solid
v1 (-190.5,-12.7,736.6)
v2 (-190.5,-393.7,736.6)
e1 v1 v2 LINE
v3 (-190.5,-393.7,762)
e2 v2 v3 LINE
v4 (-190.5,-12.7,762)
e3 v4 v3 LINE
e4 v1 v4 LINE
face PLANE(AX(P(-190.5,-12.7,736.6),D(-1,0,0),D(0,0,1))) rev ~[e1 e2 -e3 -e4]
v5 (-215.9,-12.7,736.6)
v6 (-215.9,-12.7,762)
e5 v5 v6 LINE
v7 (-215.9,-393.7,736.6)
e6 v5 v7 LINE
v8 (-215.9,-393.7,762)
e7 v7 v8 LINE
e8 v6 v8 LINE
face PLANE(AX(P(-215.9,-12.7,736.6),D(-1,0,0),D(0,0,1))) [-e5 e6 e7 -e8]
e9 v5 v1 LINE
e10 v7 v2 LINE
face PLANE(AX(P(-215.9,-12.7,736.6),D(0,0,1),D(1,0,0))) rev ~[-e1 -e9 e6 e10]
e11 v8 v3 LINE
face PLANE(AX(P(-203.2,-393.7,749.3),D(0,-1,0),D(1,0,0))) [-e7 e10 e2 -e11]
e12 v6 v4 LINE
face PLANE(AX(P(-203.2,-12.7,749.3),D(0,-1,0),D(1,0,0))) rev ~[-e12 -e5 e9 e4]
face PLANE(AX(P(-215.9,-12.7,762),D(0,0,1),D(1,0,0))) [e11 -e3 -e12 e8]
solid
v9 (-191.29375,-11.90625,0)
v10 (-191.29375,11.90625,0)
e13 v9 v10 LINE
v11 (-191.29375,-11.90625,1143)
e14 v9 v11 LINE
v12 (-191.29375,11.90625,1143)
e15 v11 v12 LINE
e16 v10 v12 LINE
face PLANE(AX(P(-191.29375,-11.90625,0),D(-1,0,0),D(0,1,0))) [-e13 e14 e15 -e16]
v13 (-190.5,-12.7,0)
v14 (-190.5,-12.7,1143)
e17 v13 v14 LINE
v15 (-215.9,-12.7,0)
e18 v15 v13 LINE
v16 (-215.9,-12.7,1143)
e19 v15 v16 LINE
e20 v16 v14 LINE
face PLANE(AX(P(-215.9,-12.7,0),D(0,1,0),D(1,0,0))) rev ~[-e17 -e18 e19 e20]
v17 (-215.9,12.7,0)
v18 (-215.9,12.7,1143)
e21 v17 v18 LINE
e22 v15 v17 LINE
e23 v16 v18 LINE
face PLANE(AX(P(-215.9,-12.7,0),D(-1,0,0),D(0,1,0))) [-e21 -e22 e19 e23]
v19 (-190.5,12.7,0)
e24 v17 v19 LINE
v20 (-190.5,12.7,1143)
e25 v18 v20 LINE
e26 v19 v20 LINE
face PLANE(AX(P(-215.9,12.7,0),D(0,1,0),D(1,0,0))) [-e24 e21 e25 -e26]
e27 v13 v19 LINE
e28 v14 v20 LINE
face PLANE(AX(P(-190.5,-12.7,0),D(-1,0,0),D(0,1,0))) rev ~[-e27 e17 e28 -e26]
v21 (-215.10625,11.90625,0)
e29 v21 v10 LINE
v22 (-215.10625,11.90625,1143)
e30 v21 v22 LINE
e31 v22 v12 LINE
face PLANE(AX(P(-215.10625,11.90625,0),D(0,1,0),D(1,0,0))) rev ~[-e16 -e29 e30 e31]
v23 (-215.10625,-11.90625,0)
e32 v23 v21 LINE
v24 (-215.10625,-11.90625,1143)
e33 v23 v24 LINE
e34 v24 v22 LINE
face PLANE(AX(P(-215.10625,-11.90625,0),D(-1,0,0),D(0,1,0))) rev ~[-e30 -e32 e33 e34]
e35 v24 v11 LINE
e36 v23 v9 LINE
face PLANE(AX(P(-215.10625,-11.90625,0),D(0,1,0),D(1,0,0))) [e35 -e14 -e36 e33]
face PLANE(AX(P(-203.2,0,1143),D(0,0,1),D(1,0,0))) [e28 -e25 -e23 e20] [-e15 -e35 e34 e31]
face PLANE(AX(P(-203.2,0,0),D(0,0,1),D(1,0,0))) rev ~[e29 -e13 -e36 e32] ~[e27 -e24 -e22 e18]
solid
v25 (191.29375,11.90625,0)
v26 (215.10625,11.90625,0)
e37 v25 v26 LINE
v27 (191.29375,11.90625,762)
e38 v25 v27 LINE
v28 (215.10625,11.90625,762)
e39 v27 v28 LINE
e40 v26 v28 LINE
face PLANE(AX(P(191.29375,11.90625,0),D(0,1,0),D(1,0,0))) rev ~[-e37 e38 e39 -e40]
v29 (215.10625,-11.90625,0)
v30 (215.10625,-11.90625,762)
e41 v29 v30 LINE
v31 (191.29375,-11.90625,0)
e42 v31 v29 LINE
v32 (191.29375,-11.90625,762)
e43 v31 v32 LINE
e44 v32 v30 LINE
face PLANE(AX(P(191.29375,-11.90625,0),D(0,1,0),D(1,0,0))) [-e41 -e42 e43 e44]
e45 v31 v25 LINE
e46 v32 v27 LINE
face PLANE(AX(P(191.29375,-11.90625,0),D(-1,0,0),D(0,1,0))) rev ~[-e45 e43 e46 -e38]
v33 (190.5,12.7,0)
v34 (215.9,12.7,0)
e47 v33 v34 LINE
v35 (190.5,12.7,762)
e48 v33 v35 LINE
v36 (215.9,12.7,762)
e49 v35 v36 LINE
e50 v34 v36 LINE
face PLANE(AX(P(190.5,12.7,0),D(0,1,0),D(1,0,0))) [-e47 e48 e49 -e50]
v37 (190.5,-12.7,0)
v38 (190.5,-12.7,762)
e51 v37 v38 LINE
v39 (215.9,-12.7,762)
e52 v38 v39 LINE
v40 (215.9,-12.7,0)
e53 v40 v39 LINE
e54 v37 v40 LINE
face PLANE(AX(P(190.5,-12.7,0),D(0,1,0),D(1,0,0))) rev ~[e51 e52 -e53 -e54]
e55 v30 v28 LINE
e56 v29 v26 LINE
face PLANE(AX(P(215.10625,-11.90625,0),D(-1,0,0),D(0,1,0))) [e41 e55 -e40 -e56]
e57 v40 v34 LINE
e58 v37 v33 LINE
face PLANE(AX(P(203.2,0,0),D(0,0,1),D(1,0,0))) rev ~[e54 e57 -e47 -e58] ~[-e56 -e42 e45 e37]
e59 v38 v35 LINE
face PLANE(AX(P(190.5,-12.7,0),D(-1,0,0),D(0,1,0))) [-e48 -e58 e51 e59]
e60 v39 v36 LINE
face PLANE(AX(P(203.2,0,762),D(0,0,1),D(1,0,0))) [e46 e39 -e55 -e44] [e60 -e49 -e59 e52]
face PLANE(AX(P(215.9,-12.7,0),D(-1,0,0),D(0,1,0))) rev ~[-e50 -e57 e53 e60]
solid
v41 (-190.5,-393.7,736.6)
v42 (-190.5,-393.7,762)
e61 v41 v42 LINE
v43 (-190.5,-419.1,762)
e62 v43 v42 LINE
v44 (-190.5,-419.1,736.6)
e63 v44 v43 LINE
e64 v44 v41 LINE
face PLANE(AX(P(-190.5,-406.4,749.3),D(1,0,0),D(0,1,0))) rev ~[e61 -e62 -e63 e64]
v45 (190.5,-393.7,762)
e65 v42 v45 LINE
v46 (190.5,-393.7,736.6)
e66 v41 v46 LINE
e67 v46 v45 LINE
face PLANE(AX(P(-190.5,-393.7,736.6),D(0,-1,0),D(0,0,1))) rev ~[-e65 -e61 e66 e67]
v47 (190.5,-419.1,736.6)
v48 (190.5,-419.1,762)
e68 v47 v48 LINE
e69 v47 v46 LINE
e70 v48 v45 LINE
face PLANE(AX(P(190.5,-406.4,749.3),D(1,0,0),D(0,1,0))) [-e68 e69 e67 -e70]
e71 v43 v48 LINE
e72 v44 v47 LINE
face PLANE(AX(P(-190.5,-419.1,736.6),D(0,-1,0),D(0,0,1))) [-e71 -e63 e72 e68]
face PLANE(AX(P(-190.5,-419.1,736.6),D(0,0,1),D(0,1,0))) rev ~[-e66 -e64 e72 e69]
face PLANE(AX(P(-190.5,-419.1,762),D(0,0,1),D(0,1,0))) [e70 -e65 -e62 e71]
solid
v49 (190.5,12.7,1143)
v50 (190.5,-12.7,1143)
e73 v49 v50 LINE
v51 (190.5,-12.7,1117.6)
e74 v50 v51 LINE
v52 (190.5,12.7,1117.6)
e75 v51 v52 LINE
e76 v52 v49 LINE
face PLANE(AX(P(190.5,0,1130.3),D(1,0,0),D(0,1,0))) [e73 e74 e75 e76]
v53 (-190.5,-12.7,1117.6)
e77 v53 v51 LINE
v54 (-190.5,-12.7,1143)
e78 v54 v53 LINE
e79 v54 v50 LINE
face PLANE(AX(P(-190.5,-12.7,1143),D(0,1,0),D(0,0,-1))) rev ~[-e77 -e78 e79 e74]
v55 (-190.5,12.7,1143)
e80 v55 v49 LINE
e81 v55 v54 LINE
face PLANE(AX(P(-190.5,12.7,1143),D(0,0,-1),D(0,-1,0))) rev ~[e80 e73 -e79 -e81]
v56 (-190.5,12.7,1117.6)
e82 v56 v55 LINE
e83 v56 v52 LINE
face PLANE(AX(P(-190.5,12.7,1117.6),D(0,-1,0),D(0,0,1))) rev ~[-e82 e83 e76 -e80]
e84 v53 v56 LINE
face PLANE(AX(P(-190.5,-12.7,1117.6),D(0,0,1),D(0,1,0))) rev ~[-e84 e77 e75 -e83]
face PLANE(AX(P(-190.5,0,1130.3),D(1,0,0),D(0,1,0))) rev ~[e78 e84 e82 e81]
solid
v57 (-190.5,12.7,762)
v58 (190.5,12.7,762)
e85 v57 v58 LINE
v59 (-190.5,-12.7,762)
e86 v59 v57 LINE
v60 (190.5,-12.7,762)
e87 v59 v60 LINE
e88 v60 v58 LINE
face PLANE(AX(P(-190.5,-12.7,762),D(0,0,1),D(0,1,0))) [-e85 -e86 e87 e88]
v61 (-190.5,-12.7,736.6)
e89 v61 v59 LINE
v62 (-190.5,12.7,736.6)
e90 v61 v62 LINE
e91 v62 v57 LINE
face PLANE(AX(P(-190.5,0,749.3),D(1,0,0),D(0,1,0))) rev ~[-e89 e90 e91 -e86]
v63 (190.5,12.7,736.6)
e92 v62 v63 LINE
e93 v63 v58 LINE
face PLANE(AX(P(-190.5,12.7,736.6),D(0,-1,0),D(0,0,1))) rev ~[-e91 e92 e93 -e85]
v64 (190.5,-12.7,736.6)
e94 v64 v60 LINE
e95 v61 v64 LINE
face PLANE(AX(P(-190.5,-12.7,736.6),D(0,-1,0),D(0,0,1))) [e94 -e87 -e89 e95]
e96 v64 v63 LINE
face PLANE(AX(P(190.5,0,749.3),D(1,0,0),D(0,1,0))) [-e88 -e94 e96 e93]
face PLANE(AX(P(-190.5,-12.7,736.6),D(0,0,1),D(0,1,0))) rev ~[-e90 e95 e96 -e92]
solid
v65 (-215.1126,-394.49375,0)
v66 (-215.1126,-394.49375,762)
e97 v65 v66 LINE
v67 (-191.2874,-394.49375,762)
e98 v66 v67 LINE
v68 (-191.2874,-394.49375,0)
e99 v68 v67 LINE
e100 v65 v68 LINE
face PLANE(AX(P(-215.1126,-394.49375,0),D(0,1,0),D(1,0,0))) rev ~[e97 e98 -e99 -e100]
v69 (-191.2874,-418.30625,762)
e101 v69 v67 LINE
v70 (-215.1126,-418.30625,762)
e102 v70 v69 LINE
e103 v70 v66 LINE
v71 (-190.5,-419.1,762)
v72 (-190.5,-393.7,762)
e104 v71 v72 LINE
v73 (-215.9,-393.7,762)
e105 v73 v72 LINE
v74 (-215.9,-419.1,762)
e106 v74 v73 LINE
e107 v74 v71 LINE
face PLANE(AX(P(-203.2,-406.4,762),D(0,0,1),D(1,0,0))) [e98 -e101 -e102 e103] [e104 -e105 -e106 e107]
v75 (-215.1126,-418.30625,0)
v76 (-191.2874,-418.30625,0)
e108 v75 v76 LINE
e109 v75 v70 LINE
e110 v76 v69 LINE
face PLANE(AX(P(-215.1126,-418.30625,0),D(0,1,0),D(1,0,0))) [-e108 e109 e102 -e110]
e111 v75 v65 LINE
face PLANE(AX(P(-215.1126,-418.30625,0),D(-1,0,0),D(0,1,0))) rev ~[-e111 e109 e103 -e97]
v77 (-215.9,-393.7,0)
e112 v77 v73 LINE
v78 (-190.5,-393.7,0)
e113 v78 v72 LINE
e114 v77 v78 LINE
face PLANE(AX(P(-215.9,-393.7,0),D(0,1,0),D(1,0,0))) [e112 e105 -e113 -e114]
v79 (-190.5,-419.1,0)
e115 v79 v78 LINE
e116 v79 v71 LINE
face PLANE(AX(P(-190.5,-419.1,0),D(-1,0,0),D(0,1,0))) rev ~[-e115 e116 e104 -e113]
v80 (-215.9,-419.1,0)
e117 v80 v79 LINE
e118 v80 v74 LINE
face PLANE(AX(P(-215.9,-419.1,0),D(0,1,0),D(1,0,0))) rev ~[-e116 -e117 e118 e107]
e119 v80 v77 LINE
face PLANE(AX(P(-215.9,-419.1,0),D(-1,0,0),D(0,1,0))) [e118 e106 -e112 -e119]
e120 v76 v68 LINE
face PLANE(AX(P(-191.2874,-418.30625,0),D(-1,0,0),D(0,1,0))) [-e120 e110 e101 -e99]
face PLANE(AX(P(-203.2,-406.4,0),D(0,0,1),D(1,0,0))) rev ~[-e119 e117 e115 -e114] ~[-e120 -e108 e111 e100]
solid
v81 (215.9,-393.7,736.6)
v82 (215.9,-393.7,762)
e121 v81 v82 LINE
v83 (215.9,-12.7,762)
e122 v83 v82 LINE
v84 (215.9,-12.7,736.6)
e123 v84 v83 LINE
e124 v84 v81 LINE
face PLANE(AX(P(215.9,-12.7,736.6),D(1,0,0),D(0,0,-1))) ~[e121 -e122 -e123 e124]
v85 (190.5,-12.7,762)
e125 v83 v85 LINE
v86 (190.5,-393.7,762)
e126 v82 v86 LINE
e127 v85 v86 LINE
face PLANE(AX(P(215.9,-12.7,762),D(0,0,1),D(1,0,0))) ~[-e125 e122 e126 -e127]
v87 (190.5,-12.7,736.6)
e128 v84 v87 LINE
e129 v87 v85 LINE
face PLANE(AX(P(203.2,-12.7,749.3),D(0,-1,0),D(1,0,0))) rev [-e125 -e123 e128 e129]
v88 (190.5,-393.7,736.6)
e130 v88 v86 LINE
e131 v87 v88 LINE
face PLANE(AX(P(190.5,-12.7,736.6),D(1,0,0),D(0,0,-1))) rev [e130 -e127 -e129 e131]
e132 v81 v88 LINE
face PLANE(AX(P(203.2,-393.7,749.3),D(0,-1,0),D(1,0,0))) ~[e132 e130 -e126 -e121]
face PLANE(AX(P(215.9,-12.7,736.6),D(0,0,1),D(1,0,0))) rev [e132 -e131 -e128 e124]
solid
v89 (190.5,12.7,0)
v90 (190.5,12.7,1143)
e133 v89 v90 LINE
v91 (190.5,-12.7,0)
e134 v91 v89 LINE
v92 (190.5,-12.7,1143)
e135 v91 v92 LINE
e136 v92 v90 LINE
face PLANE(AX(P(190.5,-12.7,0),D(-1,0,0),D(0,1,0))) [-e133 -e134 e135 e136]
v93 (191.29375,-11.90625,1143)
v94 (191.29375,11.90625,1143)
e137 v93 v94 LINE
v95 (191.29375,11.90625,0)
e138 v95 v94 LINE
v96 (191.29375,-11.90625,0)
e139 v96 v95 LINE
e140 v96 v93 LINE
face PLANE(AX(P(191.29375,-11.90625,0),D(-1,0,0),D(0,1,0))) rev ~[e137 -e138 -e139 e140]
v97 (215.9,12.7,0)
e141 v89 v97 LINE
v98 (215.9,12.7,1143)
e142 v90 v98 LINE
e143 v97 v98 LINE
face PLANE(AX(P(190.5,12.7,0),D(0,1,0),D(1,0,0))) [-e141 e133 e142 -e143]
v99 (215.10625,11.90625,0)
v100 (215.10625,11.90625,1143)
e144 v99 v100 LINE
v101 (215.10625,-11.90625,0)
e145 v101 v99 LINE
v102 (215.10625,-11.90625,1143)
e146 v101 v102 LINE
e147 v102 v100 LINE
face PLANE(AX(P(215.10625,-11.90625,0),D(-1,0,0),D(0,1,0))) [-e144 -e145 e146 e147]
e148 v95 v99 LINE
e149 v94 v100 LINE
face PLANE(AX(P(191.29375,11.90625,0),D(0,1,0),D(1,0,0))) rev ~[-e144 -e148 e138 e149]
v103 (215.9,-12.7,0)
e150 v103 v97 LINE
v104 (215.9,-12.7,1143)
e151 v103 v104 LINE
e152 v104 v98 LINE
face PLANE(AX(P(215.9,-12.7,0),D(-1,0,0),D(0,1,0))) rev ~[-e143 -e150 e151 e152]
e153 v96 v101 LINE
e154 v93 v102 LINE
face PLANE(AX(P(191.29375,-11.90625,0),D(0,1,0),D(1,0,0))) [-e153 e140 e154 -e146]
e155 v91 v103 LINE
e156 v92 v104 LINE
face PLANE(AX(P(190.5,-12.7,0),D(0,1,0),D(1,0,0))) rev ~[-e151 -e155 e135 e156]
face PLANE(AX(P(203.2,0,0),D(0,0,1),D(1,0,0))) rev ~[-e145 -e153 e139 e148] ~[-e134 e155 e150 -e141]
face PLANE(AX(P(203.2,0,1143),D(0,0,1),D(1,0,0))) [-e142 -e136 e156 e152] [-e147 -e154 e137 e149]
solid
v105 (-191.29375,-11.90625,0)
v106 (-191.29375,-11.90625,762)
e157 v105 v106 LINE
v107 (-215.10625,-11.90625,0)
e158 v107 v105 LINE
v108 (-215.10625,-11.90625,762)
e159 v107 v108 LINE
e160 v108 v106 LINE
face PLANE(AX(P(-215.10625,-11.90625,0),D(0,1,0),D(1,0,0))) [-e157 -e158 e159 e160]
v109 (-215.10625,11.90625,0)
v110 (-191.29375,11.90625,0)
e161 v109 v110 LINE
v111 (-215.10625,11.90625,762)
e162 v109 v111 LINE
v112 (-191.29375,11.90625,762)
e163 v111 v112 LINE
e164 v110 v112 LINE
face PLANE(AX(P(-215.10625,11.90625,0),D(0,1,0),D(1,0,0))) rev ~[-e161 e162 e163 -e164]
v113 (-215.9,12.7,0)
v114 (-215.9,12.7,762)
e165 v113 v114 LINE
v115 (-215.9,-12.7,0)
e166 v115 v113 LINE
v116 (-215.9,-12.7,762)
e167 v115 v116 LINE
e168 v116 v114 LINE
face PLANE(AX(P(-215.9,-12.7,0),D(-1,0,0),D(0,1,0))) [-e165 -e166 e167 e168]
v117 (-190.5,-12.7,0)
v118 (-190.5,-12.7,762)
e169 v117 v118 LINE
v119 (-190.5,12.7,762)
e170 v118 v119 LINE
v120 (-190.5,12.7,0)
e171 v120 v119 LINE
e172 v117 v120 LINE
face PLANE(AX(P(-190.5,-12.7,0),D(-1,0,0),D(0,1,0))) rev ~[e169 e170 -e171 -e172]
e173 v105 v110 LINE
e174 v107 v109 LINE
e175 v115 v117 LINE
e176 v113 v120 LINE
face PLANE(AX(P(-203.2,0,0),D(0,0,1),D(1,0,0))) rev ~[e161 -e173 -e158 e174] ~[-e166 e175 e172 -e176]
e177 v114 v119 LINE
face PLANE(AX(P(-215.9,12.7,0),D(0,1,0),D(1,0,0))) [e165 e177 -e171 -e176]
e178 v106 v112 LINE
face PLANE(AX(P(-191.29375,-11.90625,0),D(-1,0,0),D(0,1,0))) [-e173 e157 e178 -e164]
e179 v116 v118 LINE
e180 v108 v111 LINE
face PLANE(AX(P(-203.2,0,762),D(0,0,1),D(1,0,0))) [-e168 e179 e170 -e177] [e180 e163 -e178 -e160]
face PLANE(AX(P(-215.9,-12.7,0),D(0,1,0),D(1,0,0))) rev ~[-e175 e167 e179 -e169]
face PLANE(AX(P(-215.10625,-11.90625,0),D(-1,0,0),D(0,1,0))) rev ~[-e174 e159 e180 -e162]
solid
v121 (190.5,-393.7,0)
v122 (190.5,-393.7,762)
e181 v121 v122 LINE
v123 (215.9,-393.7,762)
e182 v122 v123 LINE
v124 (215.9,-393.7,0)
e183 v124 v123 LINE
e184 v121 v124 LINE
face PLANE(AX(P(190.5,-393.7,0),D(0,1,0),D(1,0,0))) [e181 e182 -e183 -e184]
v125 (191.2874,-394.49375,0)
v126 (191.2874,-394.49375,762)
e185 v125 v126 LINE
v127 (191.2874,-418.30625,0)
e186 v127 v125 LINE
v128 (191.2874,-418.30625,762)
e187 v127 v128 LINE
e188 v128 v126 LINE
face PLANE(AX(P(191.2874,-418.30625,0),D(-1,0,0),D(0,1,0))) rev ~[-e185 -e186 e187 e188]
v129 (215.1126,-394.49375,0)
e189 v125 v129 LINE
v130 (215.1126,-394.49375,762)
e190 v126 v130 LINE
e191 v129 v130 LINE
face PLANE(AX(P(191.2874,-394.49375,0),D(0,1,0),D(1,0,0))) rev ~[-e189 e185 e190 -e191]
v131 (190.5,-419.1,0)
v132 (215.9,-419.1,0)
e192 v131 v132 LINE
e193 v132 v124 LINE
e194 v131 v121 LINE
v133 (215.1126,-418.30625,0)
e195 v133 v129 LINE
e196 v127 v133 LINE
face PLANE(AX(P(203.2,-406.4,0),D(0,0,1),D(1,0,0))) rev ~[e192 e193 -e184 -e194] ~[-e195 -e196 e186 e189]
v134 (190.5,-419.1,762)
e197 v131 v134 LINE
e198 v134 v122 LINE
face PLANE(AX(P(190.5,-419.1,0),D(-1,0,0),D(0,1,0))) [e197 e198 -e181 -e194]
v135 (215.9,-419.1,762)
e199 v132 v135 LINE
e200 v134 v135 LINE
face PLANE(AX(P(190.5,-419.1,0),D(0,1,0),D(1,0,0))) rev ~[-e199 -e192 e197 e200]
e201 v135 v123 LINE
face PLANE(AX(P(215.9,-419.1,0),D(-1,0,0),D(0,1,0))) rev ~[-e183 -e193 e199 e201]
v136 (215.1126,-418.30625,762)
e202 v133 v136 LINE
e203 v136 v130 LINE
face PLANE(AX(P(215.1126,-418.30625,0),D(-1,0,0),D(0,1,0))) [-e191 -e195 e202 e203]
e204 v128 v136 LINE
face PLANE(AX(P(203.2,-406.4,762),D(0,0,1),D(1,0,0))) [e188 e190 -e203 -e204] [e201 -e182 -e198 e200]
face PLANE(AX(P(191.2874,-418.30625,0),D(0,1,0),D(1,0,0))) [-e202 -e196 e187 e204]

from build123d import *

# Parameters (mm, degrees)
F0_W      = 25.4
F0_H      = 25.4
F0_W_2    = 23.8125
F0_H_2    = 23.8125
F1_DEPTH  = 1143
F0_W_3    = 23.8252
F2_W      = 25.4
F2_H      = 25.4
F3_DEPTH  = 381
F7_DEPTH  = 762
F8_W      = 25.4
F8_H      = 25.4
F9_DEPTH  = 381
F10_W     = 25.4
F10_H     = 38.2154002551
F11_DEPTH = 381
F10_H_2   = 25.4
F14_DEPTH = 381


# Not quite as in the source:
# - the program builds the solid bodies; features that only make, move or delete a surface that nothing else refers to are left out


with BuildPart() as f1:
    # F0 (on Top) → F1 (new body)
    with BuildSketch(Plane.XY):
        with Locations((-203.2, 0)):
            Rectangle(F0_W, F0_H)
        with Locations((-203.2, 0)):
            Rectangle(F0_W_2, F0_H_2, mode=Mode.SUBTRACT)
    extrude(amount=F1_DEPTH)


with BuildPart() as f1b:
    # F0 (on Top) → F1, piece 2 (new body)
    with BuildSketch(Plane.XY):
        with Locations((203.2, 0)):
            Rectangle(F0_W, F0_H)
        with Locations((203.2, 0)):
            Rectangle(F0_W_2, F0_H_2, mode=Mode.SUBTRACT)
    extrude(amount=F1_DEPTH)


with BuildPart() as f1c:
    # F0 (on Top) → F1, piece 3 (new body)
    with BuildSketch(Plane.XY):
        with Locations((-203.2, -406.4)):
            Rectangle(F0_W, F0_H)
        with Locations((-203.2, -406.4)):
            Rectangle(F0_W_3, F0_H_2, mode=Mode.SUBTRACT)
    extrude(amount=F1_DEPTH)


with BuildPart() as f1d:
    # F0 (on Top) → F1, piece 4 (new body)
    with BuildSketch(Plane.XY):
        with Locations((203.2, -406.4)):
            Rectangle(F0_W, F0_H)
        with Locations((203.2, -406.4)):
            Rectangle(F0_W_3, F0_H_2, mode=Mode.SUBTRACT)
    extrude(amount=F1_DEPTH)


with BuildPart() as f3:
    # F2 (on face) → F3 (new body)
    with BuildSketch(Plane.XZ.offset(12.7)):
        with Locations((-203.2, 749.3)):
            Rectangle(F2_W, F2_H)
    extrude(amount=F3_DEPTH)


with BuildPart() as f4_1:
    # F4: instance of F3
    add(f3.part.mirror(Plane.YZ))


with BuildPart() as f7:
    # F0 (on Top) → F7 (new body)
    with BuildSketch(Plane.XY):
        with Locations((-203.2, 0)):
            Rectangle(F0_W, F0_H)
        with Locations((-203.2, 0)):
            Rectangle(F0_W_2, F0_H_2, mode=Mode.SUBTRACT)
    extrude(amount=F7_DEPTH)


with BuildPart() as f7b:
    # F0 (on Top) → F7, piece 2 (new body)
    with BuildSketch(Plane.XY):
        with Locations((203.2, 0)):
            Rectangle(F0_W, F0_H)
        with Locations((203.2, 0)):
            Rectangle(F0_W_2, F0_H_2, mode=Mode.SUBTRACT)
    extrude(amount=F7_DEPTH)


with BuildPart() as f7c:
    # F0 (on Top) → F7, piece 3 (new body)
    with BuildSketch(Plane.XY):
        with Locations((-203.2, -406.4)):
            Rectangle(F0_W, F0_H)
        with Locations((-203.2, -406.4)):
            Rectangle(F0_W_3, F0_H_2, mode=Mode.SUBTRACT)
    extrude(amount=F7_DEPTH)


with BuildPart() as f7d:
    # F0 (on Top) → F7, piece 4 (new body)
    with BuildSketch(Plane.XY):
        with Locations((203.2, -406.4)):
            Rectangle(F0_W, F0_H)
        with Locations((203.2, -406.4)):
            Rectangle(F0_W_3, F0_H_2, mode=Mode.SUBTRACT)
    extrude(amount=F7_DEPTH)


with BuildPart() as f9:
    # F8 (on face) → F9 (new body)
    with BuildSketch(Plane.YZ.offset(-190.5)):
        with Locations((-406.4, 749.3)):
            Rectangle(F8_W, F8_H)
    extrude(amount=F9_DEPTH)


with BuildPart() as f11:
    # F10 (on face) → F11 (new body)
    with BuildSketch(Plane.YZ.offset(-190.5)):
        with Locations((0, 1047.0973100239)):
            Rectangle(F10_W, F10_H)
    extrude(amount=F11_DEPTH)


with BuildPart() as f11b:
    # F10 (on face) → F11, piece 2 (new body)
    with BuildSketch(Plane.YZ.offset(-190.5)):
        with Locations((0, 749.3)):
            Rectangle(F10_W, F10_H_2)
    extrude(amount=F11_DEPTH)


with BuildPart() as f14:
    # F13 (on face) → F14 (new body)
    with BuildSketch(Plane.YZ.offset(-190.5)):
        Polygon((12.7, 1117.6), (12.7, 1143), (-12.7, 1143), (-12.7, 1117.6), (-11.1125, 1117.6), align=None)
    extrude(amount=F14_DEPTH)


solid = Compound([f1.part, f1b.part, f3.part, f4_1.part, f7.part, f7b.part, f7c.part, f7d.part, f9.part, f11b.part, f14.part])
